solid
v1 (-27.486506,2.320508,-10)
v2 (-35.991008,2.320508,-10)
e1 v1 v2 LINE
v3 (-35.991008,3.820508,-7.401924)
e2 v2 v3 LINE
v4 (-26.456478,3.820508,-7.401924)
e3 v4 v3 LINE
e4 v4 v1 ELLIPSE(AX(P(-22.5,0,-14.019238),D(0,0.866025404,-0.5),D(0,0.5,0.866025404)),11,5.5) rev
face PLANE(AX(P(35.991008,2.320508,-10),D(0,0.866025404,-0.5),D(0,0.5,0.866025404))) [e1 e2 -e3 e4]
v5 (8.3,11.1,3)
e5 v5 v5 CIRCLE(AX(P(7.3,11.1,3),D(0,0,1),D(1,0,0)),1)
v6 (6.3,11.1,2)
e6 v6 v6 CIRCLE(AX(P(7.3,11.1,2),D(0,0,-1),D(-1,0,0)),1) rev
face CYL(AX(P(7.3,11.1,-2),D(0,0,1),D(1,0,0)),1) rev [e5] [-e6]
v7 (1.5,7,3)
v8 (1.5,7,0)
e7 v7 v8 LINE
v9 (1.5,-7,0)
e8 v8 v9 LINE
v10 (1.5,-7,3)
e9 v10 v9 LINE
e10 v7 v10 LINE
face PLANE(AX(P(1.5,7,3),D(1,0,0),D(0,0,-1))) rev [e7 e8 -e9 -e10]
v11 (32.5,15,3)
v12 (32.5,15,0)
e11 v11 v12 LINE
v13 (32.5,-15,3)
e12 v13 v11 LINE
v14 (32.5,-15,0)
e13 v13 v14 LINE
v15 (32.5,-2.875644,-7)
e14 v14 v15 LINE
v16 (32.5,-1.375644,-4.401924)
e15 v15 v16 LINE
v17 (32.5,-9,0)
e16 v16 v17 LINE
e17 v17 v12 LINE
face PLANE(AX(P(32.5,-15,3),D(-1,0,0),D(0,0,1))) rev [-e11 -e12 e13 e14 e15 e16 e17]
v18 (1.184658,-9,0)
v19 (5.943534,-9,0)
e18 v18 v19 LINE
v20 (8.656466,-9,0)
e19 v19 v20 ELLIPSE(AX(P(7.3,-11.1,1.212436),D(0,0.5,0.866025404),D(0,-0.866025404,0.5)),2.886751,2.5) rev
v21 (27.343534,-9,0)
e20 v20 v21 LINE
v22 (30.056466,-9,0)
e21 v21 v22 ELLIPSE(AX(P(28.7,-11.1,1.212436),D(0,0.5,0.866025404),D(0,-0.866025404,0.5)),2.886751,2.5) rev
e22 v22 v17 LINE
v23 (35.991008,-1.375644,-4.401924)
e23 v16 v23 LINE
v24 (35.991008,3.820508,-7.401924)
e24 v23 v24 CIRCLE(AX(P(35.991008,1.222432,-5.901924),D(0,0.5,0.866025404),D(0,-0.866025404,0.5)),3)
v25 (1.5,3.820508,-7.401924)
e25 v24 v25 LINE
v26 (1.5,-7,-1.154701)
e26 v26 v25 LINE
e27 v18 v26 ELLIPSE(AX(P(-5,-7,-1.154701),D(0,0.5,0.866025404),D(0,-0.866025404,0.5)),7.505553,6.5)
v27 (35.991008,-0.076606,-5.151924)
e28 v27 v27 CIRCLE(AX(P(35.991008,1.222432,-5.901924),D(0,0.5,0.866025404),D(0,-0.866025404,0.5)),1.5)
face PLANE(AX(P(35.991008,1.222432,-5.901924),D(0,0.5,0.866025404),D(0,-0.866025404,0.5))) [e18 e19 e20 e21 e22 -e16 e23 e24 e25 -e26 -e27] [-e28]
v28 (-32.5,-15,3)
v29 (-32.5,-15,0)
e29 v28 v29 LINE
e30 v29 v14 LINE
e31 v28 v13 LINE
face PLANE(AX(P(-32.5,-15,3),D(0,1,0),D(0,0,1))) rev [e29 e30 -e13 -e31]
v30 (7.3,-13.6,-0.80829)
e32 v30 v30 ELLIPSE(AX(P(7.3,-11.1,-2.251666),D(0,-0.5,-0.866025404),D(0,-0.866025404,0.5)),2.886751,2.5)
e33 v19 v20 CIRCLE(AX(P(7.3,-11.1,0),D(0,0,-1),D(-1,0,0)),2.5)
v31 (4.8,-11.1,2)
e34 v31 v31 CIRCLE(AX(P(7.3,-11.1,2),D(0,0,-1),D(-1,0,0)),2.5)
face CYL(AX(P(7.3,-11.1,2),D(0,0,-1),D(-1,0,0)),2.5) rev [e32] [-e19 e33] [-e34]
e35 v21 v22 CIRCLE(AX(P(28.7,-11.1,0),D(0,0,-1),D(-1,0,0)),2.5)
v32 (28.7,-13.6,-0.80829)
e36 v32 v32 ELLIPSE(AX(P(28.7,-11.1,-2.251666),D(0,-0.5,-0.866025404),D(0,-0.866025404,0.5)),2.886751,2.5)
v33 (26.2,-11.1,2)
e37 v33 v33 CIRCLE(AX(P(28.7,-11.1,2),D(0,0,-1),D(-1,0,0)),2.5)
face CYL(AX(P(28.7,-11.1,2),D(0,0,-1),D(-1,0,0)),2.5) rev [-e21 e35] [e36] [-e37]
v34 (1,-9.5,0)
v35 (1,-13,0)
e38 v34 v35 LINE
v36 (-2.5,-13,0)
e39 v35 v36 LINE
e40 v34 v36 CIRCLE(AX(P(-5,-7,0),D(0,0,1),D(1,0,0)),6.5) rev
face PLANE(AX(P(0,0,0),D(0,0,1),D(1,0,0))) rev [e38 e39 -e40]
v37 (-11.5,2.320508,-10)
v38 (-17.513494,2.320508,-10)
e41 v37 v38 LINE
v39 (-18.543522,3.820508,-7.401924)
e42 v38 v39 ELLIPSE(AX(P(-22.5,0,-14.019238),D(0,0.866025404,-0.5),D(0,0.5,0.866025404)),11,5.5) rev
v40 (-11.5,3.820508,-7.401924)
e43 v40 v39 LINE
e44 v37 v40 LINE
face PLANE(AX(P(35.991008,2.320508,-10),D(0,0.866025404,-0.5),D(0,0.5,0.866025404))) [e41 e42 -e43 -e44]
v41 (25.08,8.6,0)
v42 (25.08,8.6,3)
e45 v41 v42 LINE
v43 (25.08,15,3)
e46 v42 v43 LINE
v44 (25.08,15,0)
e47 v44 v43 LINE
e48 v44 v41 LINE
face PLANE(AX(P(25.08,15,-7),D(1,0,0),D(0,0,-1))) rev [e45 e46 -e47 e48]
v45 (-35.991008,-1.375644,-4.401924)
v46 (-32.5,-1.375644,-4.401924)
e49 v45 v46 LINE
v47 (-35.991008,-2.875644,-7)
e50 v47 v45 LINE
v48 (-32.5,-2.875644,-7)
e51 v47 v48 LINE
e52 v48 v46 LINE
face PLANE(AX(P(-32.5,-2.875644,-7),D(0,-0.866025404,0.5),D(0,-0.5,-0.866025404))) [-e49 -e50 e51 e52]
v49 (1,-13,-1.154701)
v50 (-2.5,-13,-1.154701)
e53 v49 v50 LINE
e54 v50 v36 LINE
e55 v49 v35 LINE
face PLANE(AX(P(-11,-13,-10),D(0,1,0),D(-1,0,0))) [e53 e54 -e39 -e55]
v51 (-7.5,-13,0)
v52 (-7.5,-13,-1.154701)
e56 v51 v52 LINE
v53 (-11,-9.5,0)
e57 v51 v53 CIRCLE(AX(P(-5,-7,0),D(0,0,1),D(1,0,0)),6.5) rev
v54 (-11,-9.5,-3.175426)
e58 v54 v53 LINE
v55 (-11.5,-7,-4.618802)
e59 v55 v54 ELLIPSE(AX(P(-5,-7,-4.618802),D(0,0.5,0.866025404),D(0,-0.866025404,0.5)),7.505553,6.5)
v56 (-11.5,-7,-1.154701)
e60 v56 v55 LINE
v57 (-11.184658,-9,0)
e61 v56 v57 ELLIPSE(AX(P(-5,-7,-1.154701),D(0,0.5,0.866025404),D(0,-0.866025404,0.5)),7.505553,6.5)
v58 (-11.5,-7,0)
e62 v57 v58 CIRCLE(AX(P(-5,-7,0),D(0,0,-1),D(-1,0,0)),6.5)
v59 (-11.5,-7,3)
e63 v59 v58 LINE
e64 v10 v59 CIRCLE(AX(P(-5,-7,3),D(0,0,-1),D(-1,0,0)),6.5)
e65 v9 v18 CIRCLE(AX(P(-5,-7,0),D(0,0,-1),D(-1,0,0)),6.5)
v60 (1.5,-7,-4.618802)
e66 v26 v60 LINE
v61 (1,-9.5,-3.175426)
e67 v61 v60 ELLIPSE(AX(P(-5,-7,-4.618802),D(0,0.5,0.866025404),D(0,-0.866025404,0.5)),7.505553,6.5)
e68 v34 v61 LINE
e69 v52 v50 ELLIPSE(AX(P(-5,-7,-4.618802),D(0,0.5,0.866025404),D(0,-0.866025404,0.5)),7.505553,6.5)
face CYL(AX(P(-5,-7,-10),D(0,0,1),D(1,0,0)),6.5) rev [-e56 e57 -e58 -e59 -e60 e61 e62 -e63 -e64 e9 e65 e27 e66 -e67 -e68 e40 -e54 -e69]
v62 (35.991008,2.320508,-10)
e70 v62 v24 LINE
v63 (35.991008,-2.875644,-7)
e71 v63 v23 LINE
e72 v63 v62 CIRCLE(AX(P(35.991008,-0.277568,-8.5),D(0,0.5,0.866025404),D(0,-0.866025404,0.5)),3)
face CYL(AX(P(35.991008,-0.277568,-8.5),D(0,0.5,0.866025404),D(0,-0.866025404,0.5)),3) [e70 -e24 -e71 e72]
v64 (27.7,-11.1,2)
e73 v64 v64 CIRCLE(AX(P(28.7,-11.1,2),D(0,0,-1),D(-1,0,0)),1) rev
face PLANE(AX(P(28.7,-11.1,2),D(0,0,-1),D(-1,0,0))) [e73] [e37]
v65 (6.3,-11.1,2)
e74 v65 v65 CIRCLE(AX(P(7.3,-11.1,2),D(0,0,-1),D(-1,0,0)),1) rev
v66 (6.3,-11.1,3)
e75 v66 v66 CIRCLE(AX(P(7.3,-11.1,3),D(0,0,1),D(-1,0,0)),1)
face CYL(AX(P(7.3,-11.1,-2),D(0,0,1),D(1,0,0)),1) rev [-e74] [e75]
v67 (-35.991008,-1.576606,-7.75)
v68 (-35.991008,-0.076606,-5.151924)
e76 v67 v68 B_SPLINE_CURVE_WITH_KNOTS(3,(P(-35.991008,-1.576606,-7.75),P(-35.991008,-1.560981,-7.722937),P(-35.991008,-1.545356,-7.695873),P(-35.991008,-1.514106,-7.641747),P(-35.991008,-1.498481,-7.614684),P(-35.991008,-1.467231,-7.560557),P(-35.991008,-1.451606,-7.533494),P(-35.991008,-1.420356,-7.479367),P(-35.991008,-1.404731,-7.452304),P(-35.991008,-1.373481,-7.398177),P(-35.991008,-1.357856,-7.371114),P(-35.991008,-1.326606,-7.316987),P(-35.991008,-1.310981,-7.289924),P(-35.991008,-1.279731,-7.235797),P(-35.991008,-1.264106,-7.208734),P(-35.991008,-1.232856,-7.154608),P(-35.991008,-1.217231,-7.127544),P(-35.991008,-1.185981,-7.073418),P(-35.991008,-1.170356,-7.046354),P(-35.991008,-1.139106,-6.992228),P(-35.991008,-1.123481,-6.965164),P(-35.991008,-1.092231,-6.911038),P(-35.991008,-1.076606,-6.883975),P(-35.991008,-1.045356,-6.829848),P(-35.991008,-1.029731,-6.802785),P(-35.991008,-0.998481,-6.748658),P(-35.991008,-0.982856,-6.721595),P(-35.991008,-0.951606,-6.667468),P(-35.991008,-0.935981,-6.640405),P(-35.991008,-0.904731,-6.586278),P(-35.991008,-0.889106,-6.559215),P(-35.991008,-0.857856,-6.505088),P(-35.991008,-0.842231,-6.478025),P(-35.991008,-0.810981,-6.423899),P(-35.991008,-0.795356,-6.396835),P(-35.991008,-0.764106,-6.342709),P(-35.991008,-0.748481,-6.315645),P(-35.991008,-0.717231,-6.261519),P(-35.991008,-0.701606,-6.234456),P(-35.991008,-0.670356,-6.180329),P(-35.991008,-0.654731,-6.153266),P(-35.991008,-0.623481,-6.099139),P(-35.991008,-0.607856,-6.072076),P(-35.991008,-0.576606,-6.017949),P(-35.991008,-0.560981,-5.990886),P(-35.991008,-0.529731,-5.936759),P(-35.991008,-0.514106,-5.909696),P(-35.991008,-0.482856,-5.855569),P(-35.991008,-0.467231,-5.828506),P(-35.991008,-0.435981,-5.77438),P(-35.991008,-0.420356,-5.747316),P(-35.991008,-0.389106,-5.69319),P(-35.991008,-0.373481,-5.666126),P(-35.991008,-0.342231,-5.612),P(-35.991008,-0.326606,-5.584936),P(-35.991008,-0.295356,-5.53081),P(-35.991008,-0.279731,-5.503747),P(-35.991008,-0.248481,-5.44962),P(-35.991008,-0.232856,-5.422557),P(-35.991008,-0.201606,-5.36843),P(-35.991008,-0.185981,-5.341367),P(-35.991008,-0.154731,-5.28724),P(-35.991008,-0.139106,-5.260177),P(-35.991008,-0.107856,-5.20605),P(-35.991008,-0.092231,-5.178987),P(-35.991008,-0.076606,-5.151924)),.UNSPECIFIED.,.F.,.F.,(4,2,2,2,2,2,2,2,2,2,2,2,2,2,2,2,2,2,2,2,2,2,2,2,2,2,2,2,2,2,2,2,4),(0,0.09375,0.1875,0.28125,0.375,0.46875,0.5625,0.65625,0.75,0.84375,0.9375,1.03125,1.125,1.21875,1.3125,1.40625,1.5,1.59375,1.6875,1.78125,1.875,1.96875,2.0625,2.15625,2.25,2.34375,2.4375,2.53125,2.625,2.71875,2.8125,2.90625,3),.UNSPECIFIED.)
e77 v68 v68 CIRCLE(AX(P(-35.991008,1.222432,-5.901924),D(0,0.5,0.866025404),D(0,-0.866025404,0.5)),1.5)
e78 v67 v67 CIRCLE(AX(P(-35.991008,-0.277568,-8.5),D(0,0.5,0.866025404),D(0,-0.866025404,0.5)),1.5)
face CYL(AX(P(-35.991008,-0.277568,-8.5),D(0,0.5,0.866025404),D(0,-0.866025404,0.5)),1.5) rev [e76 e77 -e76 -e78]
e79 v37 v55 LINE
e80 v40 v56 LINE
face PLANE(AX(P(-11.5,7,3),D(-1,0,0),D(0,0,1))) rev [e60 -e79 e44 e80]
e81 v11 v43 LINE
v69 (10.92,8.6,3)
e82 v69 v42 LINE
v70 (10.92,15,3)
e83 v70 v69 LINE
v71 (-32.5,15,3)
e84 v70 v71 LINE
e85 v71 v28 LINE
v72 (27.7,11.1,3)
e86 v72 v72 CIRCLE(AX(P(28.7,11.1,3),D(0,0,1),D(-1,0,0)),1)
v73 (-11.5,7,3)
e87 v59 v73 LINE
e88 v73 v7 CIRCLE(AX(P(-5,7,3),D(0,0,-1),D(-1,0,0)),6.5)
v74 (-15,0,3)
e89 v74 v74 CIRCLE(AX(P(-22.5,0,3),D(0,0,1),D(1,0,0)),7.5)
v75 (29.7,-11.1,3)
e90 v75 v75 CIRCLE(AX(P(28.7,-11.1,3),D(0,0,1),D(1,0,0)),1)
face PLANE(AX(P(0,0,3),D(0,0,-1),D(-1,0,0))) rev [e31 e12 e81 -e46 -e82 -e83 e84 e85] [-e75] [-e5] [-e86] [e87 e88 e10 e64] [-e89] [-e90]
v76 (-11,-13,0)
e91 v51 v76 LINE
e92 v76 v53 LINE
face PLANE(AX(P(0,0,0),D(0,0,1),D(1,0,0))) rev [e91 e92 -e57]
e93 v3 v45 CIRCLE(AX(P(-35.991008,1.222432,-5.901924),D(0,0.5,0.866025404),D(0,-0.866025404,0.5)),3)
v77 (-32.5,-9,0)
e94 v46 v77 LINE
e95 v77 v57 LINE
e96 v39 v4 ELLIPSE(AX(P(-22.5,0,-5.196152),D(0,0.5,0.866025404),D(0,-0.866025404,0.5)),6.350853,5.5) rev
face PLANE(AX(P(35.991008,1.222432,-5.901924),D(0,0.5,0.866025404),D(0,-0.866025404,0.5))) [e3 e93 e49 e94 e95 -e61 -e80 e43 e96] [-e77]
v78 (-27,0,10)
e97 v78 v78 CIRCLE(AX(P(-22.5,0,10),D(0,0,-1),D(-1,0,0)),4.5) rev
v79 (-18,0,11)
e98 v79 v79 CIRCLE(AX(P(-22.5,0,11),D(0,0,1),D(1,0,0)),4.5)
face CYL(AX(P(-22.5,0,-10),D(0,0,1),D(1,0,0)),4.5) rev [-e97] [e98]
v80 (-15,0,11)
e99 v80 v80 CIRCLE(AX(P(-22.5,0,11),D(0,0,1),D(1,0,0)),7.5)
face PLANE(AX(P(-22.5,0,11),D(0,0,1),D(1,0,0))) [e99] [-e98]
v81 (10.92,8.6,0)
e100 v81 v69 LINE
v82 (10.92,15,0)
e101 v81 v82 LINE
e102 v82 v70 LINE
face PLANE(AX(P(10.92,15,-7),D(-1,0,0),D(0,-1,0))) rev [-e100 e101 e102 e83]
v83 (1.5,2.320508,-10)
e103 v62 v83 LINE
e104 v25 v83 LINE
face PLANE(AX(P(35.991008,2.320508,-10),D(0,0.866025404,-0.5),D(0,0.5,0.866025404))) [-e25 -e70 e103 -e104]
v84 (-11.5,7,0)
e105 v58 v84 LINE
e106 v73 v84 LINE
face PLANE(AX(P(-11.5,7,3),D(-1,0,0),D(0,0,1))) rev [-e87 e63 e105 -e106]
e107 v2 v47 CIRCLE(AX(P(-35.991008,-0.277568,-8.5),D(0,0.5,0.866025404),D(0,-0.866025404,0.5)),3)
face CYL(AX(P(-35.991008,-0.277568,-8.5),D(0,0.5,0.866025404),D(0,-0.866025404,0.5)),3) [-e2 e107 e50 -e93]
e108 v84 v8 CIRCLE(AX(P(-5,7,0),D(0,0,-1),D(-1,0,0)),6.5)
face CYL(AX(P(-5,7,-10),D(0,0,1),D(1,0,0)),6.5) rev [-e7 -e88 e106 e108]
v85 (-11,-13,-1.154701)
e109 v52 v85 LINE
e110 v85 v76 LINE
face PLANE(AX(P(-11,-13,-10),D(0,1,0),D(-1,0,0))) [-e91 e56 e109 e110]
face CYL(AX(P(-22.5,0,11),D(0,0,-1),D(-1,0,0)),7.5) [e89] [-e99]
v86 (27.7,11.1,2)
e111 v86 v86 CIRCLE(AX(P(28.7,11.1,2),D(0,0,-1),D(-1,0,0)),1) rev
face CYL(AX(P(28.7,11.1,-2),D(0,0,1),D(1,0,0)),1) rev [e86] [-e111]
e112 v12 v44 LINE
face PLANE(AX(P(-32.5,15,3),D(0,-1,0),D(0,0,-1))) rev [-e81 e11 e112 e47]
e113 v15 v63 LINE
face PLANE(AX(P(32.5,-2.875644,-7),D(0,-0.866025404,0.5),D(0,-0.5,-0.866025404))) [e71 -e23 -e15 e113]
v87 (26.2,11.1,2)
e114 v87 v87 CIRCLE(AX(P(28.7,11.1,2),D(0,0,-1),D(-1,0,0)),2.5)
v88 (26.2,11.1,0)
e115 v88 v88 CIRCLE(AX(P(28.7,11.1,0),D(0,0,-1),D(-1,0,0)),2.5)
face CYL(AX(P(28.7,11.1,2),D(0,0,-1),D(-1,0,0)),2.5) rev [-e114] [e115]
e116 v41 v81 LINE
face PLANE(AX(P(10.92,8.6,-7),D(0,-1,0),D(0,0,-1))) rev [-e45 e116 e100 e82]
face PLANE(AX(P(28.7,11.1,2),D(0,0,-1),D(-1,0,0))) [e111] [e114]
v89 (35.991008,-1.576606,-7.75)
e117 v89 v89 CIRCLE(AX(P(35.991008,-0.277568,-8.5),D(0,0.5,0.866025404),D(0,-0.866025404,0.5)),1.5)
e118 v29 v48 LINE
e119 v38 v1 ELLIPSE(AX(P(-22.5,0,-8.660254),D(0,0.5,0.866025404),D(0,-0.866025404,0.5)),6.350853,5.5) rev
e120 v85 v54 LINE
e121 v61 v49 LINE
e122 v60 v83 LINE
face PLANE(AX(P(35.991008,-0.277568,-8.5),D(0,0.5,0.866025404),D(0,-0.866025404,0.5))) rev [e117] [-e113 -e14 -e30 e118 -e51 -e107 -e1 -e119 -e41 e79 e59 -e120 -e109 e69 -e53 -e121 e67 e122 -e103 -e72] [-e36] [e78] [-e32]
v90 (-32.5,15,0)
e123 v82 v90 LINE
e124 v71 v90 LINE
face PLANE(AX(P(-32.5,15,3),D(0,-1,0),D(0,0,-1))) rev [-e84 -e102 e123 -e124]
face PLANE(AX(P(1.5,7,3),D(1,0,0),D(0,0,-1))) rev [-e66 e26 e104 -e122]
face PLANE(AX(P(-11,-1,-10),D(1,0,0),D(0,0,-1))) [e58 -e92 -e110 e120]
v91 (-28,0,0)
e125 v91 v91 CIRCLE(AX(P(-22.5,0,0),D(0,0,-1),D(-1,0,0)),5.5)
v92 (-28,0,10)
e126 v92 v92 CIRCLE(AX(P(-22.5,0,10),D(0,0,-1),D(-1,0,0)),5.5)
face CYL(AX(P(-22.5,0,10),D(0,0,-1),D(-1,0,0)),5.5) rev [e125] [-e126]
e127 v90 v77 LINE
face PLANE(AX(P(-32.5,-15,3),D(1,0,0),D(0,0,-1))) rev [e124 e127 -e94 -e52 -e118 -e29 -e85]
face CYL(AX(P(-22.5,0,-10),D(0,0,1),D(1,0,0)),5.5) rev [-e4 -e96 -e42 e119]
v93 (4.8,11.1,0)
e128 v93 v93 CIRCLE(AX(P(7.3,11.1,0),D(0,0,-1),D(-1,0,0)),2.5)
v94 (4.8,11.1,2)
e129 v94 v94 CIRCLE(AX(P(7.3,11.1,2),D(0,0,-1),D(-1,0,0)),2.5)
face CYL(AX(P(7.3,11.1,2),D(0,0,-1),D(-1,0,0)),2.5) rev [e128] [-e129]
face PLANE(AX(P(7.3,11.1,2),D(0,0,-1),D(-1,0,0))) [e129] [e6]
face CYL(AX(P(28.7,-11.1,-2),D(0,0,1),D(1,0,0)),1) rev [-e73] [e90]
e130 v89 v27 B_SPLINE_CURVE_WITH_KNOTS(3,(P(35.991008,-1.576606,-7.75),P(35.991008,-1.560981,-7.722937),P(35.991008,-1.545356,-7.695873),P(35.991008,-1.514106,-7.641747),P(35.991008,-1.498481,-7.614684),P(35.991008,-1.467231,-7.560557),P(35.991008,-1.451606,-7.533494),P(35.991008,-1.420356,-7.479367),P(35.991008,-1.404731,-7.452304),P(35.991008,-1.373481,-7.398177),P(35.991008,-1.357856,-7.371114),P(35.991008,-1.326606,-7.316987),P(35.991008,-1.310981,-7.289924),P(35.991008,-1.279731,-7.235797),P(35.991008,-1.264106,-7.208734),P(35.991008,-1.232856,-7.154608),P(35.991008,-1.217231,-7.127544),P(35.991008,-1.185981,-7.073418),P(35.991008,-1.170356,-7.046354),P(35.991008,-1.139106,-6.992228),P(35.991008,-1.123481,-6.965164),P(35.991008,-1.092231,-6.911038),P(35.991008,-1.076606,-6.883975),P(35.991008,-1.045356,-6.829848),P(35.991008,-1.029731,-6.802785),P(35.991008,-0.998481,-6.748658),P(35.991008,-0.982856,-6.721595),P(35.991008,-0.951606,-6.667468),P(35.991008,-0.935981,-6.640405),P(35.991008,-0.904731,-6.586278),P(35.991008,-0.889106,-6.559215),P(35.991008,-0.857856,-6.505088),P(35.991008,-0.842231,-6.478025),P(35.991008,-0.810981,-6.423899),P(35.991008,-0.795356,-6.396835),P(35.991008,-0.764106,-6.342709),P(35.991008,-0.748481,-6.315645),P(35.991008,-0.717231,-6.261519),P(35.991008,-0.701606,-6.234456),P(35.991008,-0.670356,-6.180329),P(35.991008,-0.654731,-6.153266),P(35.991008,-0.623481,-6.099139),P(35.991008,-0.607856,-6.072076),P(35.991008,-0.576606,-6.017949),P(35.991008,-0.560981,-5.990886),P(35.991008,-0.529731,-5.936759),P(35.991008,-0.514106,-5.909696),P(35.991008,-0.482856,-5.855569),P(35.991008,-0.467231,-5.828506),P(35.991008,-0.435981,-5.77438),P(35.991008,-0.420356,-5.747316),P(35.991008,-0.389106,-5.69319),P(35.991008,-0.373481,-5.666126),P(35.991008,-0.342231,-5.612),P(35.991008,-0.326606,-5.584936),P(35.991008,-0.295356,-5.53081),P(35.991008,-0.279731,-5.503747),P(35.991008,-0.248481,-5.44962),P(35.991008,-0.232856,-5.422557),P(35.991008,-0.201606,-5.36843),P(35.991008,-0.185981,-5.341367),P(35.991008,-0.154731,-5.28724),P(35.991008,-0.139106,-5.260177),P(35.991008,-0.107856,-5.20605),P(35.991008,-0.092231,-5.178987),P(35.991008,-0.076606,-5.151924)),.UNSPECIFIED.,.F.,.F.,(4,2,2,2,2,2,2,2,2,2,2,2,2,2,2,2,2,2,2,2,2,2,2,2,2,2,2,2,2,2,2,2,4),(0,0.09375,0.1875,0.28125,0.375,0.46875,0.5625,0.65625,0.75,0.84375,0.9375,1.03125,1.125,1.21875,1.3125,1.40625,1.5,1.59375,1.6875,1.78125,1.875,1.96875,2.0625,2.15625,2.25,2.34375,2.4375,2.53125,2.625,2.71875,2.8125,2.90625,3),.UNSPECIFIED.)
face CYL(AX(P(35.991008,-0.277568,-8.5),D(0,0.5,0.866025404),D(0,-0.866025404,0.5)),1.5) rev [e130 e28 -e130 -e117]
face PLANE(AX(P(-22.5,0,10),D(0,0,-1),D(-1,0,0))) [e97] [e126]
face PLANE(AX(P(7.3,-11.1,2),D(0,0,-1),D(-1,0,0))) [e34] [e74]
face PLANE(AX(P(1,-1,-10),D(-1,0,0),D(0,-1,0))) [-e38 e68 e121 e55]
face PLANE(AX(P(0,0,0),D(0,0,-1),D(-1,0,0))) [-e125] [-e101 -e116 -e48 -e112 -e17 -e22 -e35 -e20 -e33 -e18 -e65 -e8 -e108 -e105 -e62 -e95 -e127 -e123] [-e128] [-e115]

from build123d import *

# Parameters (mm, degrees)
SKETCH1_W               = 65
SKETCH1_H               = 30
BOSS_EXTRUDE1_DEPTH     = 3
SKETCH2_R               = 1
CUT_EXTRUDE1_DEPTH      = 5
SKETCH3_R               = 2.5
CUT_EXTRUDE2_DEPTH      = 2
SKETCH4_W               = 14.16
SKETCH4_H               = 6.4
CUT_EXTRUDE3_DEPTH      = 10
BOSS_EXTRUDE2_DEPTH     = 65
CUT_EXTRUDE4_START      = -60
CUT_EXTRUDE4_DEPTH      = 60
SKETCH7_R               = 1.5
BOSS_EXTRUDE3_DEPTH     = 3
BOSS_EXTRUDE3_2_DEPTH   = 3
CUT_EXTRUDE5_DEPTH      = 44.752699359
CUT_EXTRUDE5_DEPTH_BACK = 44.752699359
SKETCH8_R               = 6.5
CUT_EXTRUDE6_DEPTH      = 43.956940082
CUT_EXTRUDE6_DEPTH_BACK = 43.956940082
CUT_EXTRUDE7_DEPTH      = 3.175426481
CUT_EXTRUDE8_START      = 2
CUT_EXTRUDE8_DEPTH      = 3.695041823
SKETCH12_R              = 4.5
CUT_EXTRUDE9_DEPTH      = 44.752699359
SKETCH14_R              = 5.5
CUT_EXTRUDE10_DEPTH     = 43.956940082
SKETCH15_R              = 7.5
SKETCH15_R_2            = 4.5
BOSS_EXTRUDE4_DEPTH     = 8
SKETCH16_R              = 5.5
CUT_EXTRUDE11_DEPTH     = 10


# Read off the part's stored shape, not the designer's step: Cut-Extrude7, Cut-Extrude8
with BuildPart() as part:
    # Sketch1 → Boss-Extrude1 (new body)
    with BuildSketch(Plane.XY):
        Rectangle(SKETCH1_W, SKETCH1_H)
    extrude(amount=BOSS_EXTRUDE1_DEPTH)

    # Sketch2 → Cut-Extrude1 (cut)
    with BuildSketch(Plane.XY.offset(3)):
        with Locations((7.3, 11.1)):
            Circle(SKETCH2_R)
        with Locations(Location((28.7, 11.1, 0), (0, 0, 180))):
            Circle(SKETCH2_R)
        with Locations((28.7, -11.1)):
            Circle(SKETCH2_R)
        with Locations(Location((7.3, -11.1, 0), (0, 0, 180))):
            Circle(SKETCH2_R)
    extrude(amount=-CUT_EXTRUDE1_DEPTH, mode=Mode.SUBTRACT)

    # Sketch3 → Cut-Extrude2 (cut)
    with BuildSketch(Plane(origin=(0, 0, 0), x_dir=(-1, 0, 0), z_dir=(0, 0, -1))):
        with Locations((-7.3, 11.1)):
            Circle(SKETCH3_R)
        with Locations((-28.7, 11.1)):
            Circle(SKETCH3_R)
        with Locations((-28.7, -11.1)):
            Circle(SKETCH3_R)
        with Locations((-7.3, -11.1)):
            Circle(SKETCH3_R)
    extrude(amount=-CUT_EXTRUDE2_DEPTH, mode=Mode.SUBTRACT)

    # Sketch4 → Cut-Extrude3 (cut)
    with BuildSketch(Plane.XY.offset(3)):
        with Locations((18, 11.8)):
            Rectangle(SKETCH4_W, SKETCH4_H)
    extrude(amount=-CUT_EXTRUDE3_DEPTH, mode=Mode.SUBTRACT)

    # Sketch5 → Boss-Extrude2 (add)
    with BuildSketch(Plane(origin=(32.5, 0, 0), x_dir=(0, 0, -1), z_dir=(1, 0, 0))):
        Polygon((0, -15), (10, 2.320508076), (7.401923789, 3.820508076), (0, -9), align=None)
    extrude(amount=-BOSS_EXTRUDE2_DEPTH)

    # Sketch6 → Cut-Extrude4 (cut)
    with BuildSketch(Plane.XY.offset(CUT_EXTRUDE4_START)):
        with BuildLine():
            Line((8.656465997, -9), (5.943534003, -9))
            ThreePointArc((5.943534003, -9), (7.3, -13.6), (8.656465997, -9))
        make_face()
        with BuildLine():
            Line((30.056465997, -9), (27.343534003, -9))
            ThreePointArc((27.343534003, -9), (28.7, -13.6), (30.056465997, -9))
        make_face()
    extrude(amount=CUT_EXTRUDE4_DEPTH, mode=Mode.SUBTRACT)


with BuildPart() as body_2:
    # Sketch7 → Boss-Extrude3 (new body)
    with BuildSketch(Plane(origin=(0, -2.25, -3.897114317), x_dir=(1, 0, 0), z_dir=(0, 0.49999999999999445, 0.8660254037844419))):
        with BuildLine():
            Line((-35.991007953, 7.009618943), (-32.5, 7.009618943))
            Line((-32.5, 7.009618943), (-32.5, 1.009618943))
            Line((-32.5, 1.009618943), (-35.991007953, 1.009618943))
            ThreePointArc((-35.991007953, 1.009618943), (-38.991007953, 4.009618943), (-35.991007953, 7.009618943))
        make_face()
        with Locations(Location((-35.991007953, 4.009618943, 0), (0, 0, 270))):
            Circle(SKETCH7_R, mode=Mode.SUBTRACT)
    extrude(amount=-BOSS_EXTRUDE3_DEPTH)


with BuildPart() as body_3:
    # Sketch7 → Boss-Extrude3 2 (new body)
    with BuildSketch(Plane(origin=(0, -2.25, -3.897114317), x_dir=(1, 0, 0), z_dir=(0, 0.49999999999999445, 0.8660254037844419))):
        with BuildLine():
            Line((35.991007953, 7.009618943), (32.5, 7.009618943))
            Line((32.5, 7.009618943), (32.5, 1.009618943))
            Line((32.5, 1.009618943), (35.991007953, 1.009618943))
            ThreePointArc((35.991007953, 1.009618943), (38.991007953, 4.009618943), (35.991007953, 7.009618943))
        make_face()
        with Locations(Location((35.991007953, 4.009618943, 0), (0, 0, 270))):
            Circle(SKETCH7_R, mode=Mode.SUBTRACT)
    extrude(amount=-BOSS_EXTRUDE3_2_DEPTH)

    # Combine1: union part, body 2
    add(part.part)
    add(body_2.part)

    # Sketch8 → Cut-Extrude5 (cut, two sides: drawn at the far end of the back side and taken through both)
    with BuildSketch(Plane.XY.offset(3).offset(-CUT_EXTRUDE5_DEPTH_BACK)):
        with Locations(Location((-5, 7, 0), (0, 0, 180))):
            Circle(SKETCH8_R)
        with Locations(Location((-5, -7, 0), (0, 0, 270))):
            Circle(SKETCH8_R)
    extrude(amount=CUT_EXTRUDE5_DEPTH + CUT_EXTRUDE5_DEPTH_BACK, mode=Mode.SUBTRACT)

    # Sketch9 → Cut-Extrude6 (cut, two sides: drawn at the far end of the back side and taken through both)
    with BuildSketch(Plane(origin=(0, 0, 0), x_dir=(-1, 0, 0), z_dir=(0, 0, -1)).offset(-CUT_EXTRUDE6_DEPTH_BACK)):
        with BuildLine():
            Line((-1.5, 7), (-1.5, -7))
            ThreePointArc((-1.5, -7), (5, -13.5), (11.5, -7))
            Line((11.5, -7), (11.5, 7))
            ThreePointArc((11.5, 7), (5, 13.5), (-1.5, 7))
        make_face()
    extrude(amount=CUT_EXTRUDE6_DEPTH + CUT_EXTRUDE6_DEPTH_BACK, mode=Mode.SUBTRACT)

    # Cut-Extrude7 outline → Cut-Extrude7 (cut)
    with BuildSketch(Plane(origin=(0, 0, 0), x_dir=(-1, 0, 0), z_dir=(0, 0, -1))):
        with BuildLine():
            Line((-1, -13), (2.5, -13))
            ThreePointArc((2.5, -13), (0.403805922, -11.596194078), (-1, -9.5))
            Line((-1, -9.5), (-1, -13))
        make_face()
        with BuildLine():
            Line((11, -13), (11, -9.5))
            ThreePointArc((11, -9.5), (9.596194078, -11.596194078), (7.5, -13))
            Line((7.5, -13), (11, -13))
        make_face()
    extrude(amount=CUT_EXTRUDE7_DEPTH, mode=Mode.SUBTRACT)

    # Cut-Extrude8 outline → Cut-Extrude8 (cut)
    with BuildSketch(Plane(origin=(0, 0, 2), x_dir=(-1, 0, 0), z_dir=(0, 0, -1)).offset(CUT_EXTRUDE8_START)):
        with BuildLine():
            Line((-8.656465997, -9), (-5.943534003, -9))
            ThreePointArc((-5.943534003, -9), (-7.3, -8.6), (-8.656465997, -9))
        make_face()
        with BuildLine():
            Line((-30.056465997, -9), (-27.343534003, -9))
            ThreePointArc((-27.343534003, -9), (-28.7, -8.6), (-30.056465997, -9))
        make_face()
    extrude(amount=CUT_EXTRUDE8_DEPTH, mode=Mode.SUBTRACT)

    # Sketch12 → Cut-Extrude9 (cut, through all)
    with BuildSketch(Plane.XY.offset(3)):
        with Locations((-22.5, 0)):
            Circle(SKETCH12_R)
    extrude(amount=-CUT_EXTRUDE9_DEPTH, mode=Mode.SUBTRACT)

    # Sketch14 → Cut-Extrude10 (cut, through all)
    with BuildSketch(Plane(origin=(0, 0, 0), x_dir=(-1, 0, 0), z_dir=(0, 0, -1))):
        with Locations((22.5, 0)):
            Circle(SKETCH14_R)
    extrude(amount=CUT_EXTRUDE10_DEPTH, mode=Mode.SUBTRACT)

    # Sketch15 → Boss-Extrude4 (add)
    with BuildSketch(Plane.XY.offset(3)):
        with Locations((-22.5, 0)):
            Circle(SKETCH15_R)
        with Locations((-22.5, 0)):
            Circle(SKETCH15_R_2, mode=Mode.SUBTRACT)
    extrude(amount=BOSS_EXTRUDE4_DEPTH)

    # Sketch16 → Cut-Extrude11 (cut)
    with BuildSketch(Plane(origin=(0, 0, 0), x_dir=(-1, 0, 0), z_dir=(0, 0, -1))):
        with Locations((22.5, 0)):
            Circle(SKETCH16_R)
    extrude(amount=-CUT_EXTRUDE11_DEPTH, mode=Mode.SUBTRACT)


solid = body_3.part
